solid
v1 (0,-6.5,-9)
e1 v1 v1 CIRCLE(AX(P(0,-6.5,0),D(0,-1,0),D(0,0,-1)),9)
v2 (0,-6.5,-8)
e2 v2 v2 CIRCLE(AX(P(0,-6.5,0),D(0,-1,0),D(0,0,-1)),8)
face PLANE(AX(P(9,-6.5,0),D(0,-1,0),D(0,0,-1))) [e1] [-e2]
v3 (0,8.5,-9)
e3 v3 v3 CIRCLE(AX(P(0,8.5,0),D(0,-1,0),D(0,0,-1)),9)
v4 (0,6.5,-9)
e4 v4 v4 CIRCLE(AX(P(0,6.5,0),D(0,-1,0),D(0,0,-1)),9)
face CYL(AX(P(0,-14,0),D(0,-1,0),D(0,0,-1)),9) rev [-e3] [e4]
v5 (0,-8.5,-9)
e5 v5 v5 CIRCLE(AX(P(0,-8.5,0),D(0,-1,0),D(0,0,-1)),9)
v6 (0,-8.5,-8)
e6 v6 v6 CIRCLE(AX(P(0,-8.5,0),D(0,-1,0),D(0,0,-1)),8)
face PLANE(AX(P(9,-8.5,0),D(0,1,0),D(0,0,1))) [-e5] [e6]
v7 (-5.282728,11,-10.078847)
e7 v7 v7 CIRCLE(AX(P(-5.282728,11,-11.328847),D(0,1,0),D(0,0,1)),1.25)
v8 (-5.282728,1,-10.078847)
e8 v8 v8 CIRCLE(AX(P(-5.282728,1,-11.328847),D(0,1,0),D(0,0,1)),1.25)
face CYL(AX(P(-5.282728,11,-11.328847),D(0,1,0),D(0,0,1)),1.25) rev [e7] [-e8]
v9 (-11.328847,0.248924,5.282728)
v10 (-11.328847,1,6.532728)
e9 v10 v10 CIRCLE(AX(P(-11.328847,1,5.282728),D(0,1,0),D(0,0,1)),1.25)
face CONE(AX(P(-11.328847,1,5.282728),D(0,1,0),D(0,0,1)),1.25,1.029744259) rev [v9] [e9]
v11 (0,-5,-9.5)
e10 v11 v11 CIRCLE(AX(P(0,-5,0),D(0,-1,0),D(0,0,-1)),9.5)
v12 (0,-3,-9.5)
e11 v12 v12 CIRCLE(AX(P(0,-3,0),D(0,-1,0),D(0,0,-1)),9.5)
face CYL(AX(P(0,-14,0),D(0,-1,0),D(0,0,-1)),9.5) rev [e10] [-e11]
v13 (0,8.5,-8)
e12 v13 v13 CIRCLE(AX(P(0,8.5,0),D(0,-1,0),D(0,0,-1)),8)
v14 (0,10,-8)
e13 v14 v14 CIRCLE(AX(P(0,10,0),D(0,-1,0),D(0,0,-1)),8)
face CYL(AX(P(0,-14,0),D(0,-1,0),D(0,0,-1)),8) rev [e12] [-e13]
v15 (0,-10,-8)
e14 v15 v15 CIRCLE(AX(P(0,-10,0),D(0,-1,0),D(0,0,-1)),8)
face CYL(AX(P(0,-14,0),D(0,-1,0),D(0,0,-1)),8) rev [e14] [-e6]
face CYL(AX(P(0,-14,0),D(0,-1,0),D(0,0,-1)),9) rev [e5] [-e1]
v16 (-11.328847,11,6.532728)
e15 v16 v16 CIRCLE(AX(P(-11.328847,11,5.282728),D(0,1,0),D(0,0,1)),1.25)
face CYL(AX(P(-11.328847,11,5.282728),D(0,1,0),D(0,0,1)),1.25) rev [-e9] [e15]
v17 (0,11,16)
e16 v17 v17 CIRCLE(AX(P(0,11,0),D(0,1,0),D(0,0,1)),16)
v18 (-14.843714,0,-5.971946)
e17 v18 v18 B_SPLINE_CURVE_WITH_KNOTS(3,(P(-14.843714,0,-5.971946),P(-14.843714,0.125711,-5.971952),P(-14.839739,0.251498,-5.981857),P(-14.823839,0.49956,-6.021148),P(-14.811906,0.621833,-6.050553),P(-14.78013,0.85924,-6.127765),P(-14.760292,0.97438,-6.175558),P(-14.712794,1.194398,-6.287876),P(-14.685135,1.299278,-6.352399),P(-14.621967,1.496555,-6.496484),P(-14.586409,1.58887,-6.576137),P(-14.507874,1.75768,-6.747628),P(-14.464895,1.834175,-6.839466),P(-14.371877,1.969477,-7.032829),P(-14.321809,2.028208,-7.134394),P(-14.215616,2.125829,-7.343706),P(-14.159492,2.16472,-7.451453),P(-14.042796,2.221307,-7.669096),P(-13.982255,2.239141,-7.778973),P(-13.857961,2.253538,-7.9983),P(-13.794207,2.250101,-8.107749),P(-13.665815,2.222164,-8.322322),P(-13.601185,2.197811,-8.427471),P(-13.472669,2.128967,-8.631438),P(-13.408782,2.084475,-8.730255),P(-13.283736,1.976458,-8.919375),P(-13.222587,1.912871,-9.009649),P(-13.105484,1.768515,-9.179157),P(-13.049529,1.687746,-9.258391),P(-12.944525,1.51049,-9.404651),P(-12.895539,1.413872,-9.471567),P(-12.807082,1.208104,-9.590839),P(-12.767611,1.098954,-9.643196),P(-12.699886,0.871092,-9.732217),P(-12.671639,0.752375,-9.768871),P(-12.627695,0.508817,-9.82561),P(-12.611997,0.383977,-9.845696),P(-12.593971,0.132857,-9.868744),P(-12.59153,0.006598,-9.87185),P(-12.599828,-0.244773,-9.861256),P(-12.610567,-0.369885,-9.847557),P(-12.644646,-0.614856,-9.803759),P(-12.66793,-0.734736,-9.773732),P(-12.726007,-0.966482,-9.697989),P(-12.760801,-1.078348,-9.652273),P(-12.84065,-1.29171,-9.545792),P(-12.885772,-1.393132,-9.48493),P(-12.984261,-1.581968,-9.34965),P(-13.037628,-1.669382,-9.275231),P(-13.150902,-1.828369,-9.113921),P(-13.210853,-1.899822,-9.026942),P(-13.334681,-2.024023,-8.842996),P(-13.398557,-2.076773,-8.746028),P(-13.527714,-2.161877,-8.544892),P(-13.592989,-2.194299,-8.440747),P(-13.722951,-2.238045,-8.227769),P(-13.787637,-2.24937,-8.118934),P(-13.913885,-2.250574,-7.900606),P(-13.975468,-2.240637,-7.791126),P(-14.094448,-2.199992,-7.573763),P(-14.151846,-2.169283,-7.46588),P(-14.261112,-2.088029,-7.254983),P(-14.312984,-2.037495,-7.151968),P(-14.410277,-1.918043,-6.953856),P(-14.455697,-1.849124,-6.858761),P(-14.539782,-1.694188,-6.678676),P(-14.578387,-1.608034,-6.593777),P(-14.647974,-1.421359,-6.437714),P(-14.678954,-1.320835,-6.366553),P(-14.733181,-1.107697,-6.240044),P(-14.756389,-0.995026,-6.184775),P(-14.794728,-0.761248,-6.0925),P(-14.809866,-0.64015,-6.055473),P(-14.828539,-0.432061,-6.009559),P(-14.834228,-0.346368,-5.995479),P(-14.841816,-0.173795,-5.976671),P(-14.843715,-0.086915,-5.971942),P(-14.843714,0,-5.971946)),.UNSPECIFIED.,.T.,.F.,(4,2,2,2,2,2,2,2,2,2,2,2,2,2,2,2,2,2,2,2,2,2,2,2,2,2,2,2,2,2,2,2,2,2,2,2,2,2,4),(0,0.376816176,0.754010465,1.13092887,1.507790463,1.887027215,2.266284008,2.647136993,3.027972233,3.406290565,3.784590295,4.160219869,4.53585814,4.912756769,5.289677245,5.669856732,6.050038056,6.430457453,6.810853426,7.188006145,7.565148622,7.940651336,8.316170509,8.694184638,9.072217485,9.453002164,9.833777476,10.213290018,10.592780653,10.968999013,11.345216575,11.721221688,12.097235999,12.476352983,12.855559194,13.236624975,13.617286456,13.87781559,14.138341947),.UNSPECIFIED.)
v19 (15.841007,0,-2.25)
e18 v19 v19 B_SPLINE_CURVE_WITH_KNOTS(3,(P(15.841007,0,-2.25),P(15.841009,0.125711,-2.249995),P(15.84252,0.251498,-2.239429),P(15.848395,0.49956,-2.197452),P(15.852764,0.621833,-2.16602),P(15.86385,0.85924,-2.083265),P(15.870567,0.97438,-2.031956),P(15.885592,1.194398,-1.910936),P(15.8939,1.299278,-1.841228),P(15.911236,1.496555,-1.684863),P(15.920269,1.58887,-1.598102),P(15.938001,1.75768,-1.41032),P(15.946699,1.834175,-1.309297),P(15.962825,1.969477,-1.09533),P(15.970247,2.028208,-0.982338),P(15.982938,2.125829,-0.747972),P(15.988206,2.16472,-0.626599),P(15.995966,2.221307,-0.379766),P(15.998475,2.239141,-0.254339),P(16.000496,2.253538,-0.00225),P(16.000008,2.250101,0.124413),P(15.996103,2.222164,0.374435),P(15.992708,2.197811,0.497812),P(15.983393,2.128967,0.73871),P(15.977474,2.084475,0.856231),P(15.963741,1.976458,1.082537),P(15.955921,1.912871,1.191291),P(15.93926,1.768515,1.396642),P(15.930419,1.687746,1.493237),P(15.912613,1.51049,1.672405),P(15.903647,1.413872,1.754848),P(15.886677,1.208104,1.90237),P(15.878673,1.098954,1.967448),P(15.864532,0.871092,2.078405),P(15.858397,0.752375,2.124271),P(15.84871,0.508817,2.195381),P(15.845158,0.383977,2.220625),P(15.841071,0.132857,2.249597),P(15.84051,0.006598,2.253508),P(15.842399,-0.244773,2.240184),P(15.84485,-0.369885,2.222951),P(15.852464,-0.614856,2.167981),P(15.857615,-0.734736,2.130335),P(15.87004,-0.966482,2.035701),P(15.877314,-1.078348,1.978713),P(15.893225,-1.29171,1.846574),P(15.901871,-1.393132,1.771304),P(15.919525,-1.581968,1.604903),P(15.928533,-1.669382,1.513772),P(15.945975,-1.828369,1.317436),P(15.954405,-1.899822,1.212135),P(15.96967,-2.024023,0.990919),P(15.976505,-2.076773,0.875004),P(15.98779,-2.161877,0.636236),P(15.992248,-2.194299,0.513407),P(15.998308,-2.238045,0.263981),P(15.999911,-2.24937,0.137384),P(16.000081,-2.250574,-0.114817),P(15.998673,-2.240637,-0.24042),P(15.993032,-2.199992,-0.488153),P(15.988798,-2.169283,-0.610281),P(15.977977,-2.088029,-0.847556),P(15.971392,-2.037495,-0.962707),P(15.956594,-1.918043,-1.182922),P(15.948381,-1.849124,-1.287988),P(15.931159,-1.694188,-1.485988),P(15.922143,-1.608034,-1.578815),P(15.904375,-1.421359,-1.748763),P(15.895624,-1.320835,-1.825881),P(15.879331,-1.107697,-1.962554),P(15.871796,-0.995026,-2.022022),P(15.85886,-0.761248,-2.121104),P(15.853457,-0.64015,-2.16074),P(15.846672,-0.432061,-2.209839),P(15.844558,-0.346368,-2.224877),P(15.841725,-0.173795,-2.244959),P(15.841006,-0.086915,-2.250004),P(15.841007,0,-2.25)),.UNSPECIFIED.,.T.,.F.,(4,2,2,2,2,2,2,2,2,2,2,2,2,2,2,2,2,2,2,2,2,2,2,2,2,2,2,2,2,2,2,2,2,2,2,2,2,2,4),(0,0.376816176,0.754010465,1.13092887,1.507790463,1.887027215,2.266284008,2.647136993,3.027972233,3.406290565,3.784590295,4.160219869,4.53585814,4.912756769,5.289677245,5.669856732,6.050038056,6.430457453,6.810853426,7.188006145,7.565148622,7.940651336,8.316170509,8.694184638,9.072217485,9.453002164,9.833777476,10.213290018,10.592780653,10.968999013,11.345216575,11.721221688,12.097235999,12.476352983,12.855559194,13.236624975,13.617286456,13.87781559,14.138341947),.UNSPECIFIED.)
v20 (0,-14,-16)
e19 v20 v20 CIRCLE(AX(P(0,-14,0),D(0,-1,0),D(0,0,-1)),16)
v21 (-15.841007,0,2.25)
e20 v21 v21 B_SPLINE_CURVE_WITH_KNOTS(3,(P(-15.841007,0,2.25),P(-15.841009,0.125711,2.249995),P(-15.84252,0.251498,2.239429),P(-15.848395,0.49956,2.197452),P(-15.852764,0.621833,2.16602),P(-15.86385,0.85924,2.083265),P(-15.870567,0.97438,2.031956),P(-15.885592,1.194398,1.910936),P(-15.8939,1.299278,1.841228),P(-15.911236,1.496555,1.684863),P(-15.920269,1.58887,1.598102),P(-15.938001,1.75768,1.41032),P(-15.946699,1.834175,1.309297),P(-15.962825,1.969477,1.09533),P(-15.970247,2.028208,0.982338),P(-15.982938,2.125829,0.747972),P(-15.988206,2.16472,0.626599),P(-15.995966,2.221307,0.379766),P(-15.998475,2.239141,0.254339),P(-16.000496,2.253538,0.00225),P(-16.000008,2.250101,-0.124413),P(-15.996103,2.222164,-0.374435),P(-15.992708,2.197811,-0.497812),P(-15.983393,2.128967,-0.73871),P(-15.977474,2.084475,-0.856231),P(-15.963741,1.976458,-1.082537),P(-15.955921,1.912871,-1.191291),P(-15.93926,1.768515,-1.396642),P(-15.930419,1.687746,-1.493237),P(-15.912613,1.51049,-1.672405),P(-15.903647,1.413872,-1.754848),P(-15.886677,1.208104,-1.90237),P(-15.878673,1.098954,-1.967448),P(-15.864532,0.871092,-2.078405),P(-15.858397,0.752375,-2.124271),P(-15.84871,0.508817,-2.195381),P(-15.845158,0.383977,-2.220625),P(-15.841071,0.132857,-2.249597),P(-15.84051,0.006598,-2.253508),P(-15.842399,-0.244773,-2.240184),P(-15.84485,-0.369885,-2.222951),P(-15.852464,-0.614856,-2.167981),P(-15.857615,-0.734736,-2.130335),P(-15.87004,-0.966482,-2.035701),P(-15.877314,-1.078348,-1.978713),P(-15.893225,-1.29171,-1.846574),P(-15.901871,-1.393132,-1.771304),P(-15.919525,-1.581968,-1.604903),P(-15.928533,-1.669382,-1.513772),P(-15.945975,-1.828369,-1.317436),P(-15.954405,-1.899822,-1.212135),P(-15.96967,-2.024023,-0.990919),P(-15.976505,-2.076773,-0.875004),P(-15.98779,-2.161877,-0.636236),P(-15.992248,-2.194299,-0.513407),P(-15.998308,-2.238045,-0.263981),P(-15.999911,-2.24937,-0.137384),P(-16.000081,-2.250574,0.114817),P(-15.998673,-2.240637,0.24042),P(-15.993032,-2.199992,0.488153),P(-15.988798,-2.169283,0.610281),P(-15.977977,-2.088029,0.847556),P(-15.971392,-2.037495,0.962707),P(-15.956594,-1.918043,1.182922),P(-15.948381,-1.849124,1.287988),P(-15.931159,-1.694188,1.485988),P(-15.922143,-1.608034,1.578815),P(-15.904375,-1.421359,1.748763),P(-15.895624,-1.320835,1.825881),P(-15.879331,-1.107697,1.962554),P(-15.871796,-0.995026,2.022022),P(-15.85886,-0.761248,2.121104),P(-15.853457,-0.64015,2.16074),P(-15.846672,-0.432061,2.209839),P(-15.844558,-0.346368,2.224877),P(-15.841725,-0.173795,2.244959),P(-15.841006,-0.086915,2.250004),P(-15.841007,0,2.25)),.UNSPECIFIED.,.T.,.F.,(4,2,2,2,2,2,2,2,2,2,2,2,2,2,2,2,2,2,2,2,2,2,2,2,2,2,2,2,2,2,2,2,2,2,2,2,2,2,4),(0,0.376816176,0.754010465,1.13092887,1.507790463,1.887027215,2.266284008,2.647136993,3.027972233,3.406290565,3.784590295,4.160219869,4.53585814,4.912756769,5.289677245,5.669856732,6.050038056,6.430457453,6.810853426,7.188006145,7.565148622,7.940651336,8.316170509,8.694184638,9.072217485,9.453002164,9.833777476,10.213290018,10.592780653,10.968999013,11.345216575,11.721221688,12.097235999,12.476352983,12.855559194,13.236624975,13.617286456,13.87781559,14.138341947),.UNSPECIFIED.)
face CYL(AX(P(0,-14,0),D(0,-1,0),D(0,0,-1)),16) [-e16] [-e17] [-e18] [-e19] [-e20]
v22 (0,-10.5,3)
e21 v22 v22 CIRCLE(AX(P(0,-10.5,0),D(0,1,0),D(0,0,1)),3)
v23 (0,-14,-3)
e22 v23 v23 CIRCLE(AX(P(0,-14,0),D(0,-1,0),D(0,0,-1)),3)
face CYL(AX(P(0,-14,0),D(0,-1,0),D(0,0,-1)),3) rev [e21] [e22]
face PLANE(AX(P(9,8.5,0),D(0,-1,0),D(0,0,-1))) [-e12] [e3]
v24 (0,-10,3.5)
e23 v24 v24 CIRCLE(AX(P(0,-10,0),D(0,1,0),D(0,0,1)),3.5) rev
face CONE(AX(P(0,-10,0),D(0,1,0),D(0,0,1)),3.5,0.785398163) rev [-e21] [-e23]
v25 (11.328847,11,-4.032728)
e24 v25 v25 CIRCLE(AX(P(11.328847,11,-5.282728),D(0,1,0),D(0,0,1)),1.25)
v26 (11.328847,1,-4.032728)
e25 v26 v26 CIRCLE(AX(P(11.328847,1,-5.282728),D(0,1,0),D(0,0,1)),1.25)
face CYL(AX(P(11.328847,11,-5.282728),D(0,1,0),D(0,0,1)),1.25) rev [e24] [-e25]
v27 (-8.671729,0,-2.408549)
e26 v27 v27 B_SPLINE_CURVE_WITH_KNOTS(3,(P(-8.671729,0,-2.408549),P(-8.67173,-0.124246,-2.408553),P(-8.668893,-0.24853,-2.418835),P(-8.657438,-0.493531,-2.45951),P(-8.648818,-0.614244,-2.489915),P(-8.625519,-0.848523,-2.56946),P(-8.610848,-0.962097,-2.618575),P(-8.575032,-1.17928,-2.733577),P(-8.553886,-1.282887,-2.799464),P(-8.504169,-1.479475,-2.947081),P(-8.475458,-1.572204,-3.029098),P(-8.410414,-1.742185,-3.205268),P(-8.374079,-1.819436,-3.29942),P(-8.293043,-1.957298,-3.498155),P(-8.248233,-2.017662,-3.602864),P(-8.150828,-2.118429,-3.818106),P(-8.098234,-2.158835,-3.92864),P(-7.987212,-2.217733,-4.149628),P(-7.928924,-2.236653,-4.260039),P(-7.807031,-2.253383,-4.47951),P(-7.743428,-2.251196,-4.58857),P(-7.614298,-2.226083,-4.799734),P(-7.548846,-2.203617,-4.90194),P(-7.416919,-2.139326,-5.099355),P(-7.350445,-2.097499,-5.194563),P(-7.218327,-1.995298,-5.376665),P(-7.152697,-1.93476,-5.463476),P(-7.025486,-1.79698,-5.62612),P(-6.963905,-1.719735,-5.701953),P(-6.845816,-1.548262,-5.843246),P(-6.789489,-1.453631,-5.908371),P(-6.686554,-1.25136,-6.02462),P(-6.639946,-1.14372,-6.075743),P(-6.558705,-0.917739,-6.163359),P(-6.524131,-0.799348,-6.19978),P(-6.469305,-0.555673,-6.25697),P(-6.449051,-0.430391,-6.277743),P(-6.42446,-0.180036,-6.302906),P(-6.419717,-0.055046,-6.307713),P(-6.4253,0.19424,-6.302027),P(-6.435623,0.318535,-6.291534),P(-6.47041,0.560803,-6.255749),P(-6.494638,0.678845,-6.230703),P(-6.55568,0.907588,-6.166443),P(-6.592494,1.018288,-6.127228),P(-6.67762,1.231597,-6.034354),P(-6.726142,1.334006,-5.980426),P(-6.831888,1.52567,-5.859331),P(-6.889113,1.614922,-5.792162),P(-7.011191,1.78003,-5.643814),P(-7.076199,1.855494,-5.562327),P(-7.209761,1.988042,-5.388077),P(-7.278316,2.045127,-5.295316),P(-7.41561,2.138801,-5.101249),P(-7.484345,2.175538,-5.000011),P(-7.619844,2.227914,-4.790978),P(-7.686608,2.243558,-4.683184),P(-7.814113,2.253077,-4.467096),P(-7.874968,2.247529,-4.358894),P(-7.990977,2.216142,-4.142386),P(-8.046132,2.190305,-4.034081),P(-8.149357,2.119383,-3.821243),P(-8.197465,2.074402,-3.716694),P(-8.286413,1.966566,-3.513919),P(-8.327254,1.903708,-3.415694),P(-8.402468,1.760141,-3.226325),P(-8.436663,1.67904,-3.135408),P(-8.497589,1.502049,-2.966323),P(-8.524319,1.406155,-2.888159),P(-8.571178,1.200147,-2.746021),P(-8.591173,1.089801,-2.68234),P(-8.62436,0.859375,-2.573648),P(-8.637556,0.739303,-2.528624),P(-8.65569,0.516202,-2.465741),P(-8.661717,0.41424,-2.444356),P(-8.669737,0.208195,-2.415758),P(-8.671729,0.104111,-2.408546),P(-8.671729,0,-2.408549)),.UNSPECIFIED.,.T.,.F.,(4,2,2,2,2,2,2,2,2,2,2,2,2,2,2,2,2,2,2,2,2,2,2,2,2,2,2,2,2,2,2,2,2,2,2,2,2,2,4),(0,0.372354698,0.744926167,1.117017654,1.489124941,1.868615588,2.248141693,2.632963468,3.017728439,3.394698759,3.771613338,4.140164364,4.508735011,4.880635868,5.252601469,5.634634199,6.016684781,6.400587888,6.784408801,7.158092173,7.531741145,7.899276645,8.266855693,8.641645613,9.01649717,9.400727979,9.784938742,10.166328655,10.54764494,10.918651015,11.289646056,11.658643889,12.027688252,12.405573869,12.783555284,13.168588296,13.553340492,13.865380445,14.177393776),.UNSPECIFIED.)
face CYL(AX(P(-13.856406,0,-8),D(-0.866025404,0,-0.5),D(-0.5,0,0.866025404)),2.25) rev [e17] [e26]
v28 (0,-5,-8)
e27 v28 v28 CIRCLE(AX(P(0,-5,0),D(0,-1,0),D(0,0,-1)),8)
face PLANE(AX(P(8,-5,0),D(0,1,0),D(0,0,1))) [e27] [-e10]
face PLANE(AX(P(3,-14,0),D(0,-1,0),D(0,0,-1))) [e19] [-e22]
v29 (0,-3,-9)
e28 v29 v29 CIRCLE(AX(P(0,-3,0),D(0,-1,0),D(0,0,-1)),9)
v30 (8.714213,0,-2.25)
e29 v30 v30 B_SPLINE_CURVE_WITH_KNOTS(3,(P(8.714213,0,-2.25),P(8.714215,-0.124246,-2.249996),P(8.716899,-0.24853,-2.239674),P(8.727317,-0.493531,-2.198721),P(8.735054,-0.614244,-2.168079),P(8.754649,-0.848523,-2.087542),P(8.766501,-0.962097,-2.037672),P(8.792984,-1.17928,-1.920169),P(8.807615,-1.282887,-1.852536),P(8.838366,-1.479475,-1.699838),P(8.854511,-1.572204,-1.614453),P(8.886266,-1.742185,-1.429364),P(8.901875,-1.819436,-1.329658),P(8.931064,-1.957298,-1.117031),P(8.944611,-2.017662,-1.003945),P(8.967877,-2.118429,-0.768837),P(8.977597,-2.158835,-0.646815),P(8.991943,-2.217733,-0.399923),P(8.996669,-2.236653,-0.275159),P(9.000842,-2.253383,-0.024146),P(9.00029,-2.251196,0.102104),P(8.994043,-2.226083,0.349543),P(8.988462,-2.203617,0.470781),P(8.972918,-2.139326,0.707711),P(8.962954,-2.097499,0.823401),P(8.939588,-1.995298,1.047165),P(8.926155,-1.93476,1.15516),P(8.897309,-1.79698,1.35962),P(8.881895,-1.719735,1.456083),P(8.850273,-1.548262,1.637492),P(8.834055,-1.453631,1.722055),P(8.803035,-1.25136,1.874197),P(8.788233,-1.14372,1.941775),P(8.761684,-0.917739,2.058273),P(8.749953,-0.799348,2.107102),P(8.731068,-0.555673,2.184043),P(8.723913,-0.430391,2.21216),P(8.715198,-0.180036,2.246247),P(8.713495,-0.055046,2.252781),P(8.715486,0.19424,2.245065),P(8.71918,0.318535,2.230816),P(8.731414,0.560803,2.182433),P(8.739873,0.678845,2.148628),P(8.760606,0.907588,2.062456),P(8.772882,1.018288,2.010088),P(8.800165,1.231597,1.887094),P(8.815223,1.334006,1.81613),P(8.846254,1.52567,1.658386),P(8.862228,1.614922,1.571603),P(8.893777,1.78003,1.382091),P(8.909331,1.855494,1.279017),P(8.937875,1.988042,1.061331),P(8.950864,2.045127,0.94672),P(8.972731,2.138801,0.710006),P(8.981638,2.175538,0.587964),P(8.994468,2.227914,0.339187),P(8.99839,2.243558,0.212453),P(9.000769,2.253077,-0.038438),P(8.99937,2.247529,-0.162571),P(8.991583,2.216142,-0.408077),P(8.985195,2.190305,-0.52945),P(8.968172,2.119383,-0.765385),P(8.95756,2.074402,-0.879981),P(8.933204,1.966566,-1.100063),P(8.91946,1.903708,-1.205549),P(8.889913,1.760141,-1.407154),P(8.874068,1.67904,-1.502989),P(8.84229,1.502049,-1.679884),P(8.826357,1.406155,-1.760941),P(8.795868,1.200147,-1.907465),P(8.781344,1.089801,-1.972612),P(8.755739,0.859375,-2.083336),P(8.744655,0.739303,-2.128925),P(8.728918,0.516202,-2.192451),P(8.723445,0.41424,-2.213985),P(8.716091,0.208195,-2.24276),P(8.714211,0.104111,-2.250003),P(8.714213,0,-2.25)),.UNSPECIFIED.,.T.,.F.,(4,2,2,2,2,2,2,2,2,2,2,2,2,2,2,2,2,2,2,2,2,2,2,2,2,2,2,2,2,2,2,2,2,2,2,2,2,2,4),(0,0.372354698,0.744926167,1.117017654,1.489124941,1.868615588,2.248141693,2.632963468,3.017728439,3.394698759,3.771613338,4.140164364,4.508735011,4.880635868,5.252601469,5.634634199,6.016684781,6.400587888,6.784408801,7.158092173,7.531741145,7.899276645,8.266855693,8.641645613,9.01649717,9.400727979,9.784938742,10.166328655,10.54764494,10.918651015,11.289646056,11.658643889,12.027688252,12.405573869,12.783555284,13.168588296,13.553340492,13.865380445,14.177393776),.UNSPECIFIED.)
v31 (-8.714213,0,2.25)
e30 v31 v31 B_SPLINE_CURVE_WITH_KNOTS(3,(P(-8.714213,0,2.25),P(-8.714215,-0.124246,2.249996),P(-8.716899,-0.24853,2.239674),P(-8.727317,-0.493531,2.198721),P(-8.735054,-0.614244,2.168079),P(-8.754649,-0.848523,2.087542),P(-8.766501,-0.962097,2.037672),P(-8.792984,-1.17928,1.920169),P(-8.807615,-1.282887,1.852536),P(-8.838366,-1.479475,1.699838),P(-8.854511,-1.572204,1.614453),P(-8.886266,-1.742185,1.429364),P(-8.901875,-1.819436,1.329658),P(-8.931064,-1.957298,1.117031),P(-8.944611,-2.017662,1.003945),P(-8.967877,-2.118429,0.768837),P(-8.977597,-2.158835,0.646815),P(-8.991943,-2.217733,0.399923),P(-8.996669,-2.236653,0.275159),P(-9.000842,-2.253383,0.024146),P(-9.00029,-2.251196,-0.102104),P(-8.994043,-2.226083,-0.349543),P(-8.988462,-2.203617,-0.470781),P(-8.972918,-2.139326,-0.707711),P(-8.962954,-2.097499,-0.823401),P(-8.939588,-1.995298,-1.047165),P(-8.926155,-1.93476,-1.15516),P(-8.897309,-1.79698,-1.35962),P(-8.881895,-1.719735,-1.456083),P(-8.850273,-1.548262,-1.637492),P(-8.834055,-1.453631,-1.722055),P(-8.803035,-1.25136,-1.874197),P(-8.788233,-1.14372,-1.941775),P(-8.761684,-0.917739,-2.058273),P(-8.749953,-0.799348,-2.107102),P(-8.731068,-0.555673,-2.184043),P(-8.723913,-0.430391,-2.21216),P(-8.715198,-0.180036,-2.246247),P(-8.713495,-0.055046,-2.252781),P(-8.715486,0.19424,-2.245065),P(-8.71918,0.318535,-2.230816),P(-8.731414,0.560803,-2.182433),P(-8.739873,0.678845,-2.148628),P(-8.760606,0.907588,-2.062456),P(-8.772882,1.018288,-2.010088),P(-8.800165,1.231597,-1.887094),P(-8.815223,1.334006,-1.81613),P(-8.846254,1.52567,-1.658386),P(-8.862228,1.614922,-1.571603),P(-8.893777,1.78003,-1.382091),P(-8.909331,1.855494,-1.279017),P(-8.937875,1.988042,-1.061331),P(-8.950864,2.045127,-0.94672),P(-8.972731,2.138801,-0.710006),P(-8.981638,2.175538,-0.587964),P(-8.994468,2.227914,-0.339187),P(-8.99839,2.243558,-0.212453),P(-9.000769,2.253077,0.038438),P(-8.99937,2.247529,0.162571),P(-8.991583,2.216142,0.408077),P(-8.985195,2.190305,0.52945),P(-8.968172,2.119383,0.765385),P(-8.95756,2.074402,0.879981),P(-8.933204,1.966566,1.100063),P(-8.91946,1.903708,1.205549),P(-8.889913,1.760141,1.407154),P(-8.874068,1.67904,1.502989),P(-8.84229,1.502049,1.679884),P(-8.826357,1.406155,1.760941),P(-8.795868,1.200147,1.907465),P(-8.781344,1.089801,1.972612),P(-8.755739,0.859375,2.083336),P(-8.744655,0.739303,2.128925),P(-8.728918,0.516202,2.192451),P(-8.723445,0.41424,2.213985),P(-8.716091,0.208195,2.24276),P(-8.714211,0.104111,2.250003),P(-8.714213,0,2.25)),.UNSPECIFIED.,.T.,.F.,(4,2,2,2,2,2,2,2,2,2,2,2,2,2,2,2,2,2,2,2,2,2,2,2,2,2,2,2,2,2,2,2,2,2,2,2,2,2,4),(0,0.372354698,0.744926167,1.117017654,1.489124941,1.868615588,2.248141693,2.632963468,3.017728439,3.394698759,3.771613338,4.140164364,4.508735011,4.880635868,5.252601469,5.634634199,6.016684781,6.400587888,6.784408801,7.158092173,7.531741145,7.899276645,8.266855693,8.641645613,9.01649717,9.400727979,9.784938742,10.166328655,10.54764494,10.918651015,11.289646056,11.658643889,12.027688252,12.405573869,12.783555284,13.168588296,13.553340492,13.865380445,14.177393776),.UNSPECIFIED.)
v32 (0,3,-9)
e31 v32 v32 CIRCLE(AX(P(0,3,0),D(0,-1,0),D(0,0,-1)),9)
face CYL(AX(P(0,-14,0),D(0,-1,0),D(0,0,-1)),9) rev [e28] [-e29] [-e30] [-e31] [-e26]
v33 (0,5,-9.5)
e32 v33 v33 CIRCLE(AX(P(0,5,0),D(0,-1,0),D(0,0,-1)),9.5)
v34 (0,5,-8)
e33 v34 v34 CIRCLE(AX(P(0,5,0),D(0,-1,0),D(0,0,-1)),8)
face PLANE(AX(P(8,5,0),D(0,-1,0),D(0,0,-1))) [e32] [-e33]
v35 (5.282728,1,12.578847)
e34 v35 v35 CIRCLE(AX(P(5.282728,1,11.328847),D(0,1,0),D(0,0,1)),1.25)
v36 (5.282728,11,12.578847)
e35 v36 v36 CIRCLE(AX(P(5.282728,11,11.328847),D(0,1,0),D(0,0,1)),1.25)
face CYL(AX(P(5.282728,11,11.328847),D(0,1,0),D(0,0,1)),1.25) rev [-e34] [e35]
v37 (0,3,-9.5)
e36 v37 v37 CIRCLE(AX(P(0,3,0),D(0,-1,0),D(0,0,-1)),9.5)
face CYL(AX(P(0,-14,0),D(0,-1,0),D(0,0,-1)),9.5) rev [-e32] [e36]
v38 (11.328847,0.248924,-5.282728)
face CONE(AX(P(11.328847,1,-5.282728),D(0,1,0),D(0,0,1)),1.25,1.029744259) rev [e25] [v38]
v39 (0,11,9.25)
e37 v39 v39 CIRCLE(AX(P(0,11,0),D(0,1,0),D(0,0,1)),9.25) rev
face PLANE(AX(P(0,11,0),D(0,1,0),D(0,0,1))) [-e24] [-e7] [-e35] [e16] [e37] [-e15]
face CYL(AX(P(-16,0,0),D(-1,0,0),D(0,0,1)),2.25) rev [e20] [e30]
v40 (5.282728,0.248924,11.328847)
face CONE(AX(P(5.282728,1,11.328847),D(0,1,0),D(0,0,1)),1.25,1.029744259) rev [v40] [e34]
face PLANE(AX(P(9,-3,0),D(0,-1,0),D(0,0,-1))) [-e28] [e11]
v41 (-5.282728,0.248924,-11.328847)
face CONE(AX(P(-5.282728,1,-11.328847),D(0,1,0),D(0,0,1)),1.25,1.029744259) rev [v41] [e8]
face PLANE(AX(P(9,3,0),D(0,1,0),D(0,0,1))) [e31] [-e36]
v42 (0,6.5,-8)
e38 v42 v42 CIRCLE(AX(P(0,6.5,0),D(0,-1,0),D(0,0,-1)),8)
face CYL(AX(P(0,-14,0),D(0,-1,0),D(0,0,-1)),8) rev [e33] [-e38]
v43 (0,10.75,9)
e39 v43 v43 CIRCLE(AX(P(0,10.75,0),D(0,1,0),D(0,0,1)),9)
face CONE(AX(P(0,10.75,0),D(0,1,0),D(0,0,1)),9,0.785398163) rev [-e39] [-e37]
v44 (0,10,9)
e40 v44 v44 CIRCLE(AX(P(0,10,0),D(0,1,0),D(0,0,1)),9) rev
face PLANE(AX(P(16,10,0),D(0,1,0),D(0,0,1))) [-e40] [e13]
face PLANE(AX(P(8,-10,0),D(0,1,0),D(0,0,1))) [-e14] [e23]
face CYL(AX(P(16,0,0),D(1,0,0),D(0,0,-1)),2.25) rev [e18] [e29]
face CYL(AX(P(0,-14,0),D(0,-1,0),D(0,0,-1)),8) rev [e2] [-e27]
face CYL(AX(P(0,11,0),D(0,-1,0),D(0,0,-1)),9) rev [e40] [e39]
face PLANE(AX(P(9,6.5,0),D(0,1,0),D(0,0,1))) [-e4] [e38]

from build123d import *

# Parameters (mm, degrees)
ESBO_O4_W                        = 2.25
ESBO_O4_H                        = 16
F_4_5_4_5_DIAMETER_HOLE2_D       = 4.5
F_4_5_4_5_DIAMETER_HOLE2_DEPTH   = 18
F_4_5_4_5_DIAMETER_HOLE2_TIP     = 1.351936393
ESBO_O12_R                       = 16
ESBO_O12_R_2                     = 9
RESSALTO_EXTRUS_O1_DEPTH         = 1
CHANFRO1_SIZE                    = 0.5
CHANFRO2_SIZE                    = 0.25
FURO_DE_DI_METRO_4_5_4_5_2_D     = 4.5
FURO_DE_DI_METRO_4_5_4_5_2_DEPTH = 8
FURO_DE_DI_METRO_4_5_4_5_2_TIP   = 1.351936393


# Read off the part's stored shape, not the designer's step: PadrãoCircular5
with BuildPart() as part:
    # Esboço1 → Revolução1 (revolve)
    with BuildSketch(Plane.XY, mode=Mode.PRIVATE) as revolu_o1_sk:
        Polygon((3, -14), (16, -14), (16, 10), (8, 10), (8, 8.5), (9, 8.5), (9, 6.5), (8, 6.5), (8, 5), (9.5, 5), (9.5, 3), (9, 3), (9, -3), (9.5, -3), (9.5, -5), (8, -5), (8, -6.5), (9, -6.5), (9, -8.5), (8, -8.5), (8, -10), (3, -10), align=None)
    revolve(revolu_o1_sk.sketch.rotate(Axis((0, -14, 0), (0, 1, 0)), 90), axis=Axis((0, -14, 0), (0, 1, 0)))

    # Esboço4 → Furo de diâmetro Ø4.5 (4.5)1 (revolve, cut)
    with BuildSketch(Plane(origin=(16, 0, 0), x_dir=(0, 0, -1), z_dir=(0, 1, 0))):
        with Locations((1.125, 8)):
            Rectangle(ESBO_O4_W, ESBO_O4_H)
    revolve(axis=Axis((22.35, 0, 0), (-1, 0, 0)), mode=Mode.SUBTRACT)

    # Ø4.5 (4.5) Diameter Hole2
    with Locations(Plane(origin=(-13.856406461, 0, -8), x_dir=(0, -1, 0), z_dir=(-0.8660254037844364, 0, -0.5000000000000041))):
        with Locations((0, 0)):
            Hole(F_4_5_4_5_DIAMETER_HOLE2_D / 2, depth=F_4_5_4_5_DIAMETER_HOLE2_DEPTH)
            with Locations((0, 0, -(F_4_5_4_5_DIAMETER_HOLE2_DEPTH + F_4_5_4_5_DIAMETER_HOLE2_TIP / 2))):  # 118° drill point
                Cone(0, F_4_5_4_5_DIAMETER_HOLE2_D / 2, F_4_5_4_5_DIAMETER_HOLE2_TIP, mode=Mode.SUBTRACT)

    # Esboço12 → Ressalto-extrusão1 (add)
    with BuildSketch(Plane(origin=(0, 10, 0), x_dir=(1, 0, 0), z_dir=(0, 1, 0))):
        with Locations(Location((0, 0, 0), (0, 0, 90))):
            Circle(ESBO_O12_R)
        with Locations(Location((0, 0, 0), (0, 0, 90))):
            Circle(ESBO_O12_R_2, mode=Mode.SUBTRACT)
    extrude(amount=RESSALTO_EXTRUS_O1_DEPTH)

    # Esboço13 → Furo roscado de M3x0.51 (revolve, cut)
    with BuildSketch(Plane(origin=(11.328847338, 11, -5.282728272), x_dir=(0, 0, 1), z_dir=(1, 0, 0))):
        Polygon((0, 0), (0, 10.751075774), (1.25, 10), (1.25, 0), align=None)
    revolve(axis=Axis((11.328847338, 17.35, -5.282728272), (0, -1, 0)), mode=Mode.SUBTRACT)

    # PadrãoCircular5 outline → PadrãoCircular5 (revolve, cut)
    with BuildSketch(Plane(origin=(5.282728272, 0, 11.328847338), x_dir=(1, 0, 0), z_dir=(0, 0, 1))):
        Polygon((0, 11), (0, 0.248924226), (1.25, 1), (1.25, 11), align=None)
    revolve(axis=Axis((5.282728272, 0, 11.328847338), (0, 1, 0)), mode=Mode.SUBTRACT)

    # Padr_oCircular5 2 outline → Padr_oCircular5 2 (revolve, cut)
    with BuildSketch(Plane(origin=(-11.328847338, 0, 5.282728272), x_dir=(1, 0, 0), z_dir=(0, 0, 1))):
        Polygon((0, 11), (0, 0.248924226), (1.25, 1), (1.25, 11), align=None)
    revolve(axis=Axis((-11.328847338, 0, 5.282728272), (0, 1, 0)), mode=Mode.SUBTRACT)

    # Padr_oCircular5 3 outline → Padr_oCircular5 3 (revolve, cut)
    with BuildSketch(Plane(origin=(-5.282728272, 0, -11.328847338), x_dir=(1, 0, 0), z_dir=(0, 0, 1))):
        Polygon((0, 11), (0, 0.248924226), (1.25, 1), (1.25, 11), align=None)
    revolve(axis=Axis((-5.282728272, 0, -11.328847338), (0, 1, 0)), mode=Mode.SUBTRACT)

    # Chanfro1
    chanfro1_edges = [part.edges().sort_by_distance(p)[0] for p in [
        (0, -10, 3),
    ]]
    chamfer(chanfro1_edges, length=CHANFRO1_SIZE)

    # Chanfro2
    chanfro2_edges = [part.edges().sort_by_distance(p)[0] for p in [
        (0, 11, 9),
    ]]
    chamfer(chanfro2_edges, length=CHANFRO2_SIZE)

    # Furo de diâmetro Ø4.5 (4.5)2
    with Locations(Plane(origin=(-16, 0, 0), x_dir=(0, 0, -1), z_dir=(-1, 0, 0))):
        with Locations((0, 0)):
            Hole(FURO_DE_DI_METRO_4_5_4_5_2_D / 2, depth=FURO_DE_DI_METRO_4_5_4_5_2_DEPTH)
            with Locations((0, 0, -(FURO_DE_DI_METRO_4_5_4_5_2_DEPTH + FURO_DE_DI_METRO_4_5_4_5_2_TIP / 2))):  # 118° drill point
                Cone(0, FURO_DE_DI_METRO_4_5_4_5_2_D / 2, FURO_DE_DI_METRO_4_5_4_5_2_TIP, mode=Mode.SUBTRACT)


solid = part.part
